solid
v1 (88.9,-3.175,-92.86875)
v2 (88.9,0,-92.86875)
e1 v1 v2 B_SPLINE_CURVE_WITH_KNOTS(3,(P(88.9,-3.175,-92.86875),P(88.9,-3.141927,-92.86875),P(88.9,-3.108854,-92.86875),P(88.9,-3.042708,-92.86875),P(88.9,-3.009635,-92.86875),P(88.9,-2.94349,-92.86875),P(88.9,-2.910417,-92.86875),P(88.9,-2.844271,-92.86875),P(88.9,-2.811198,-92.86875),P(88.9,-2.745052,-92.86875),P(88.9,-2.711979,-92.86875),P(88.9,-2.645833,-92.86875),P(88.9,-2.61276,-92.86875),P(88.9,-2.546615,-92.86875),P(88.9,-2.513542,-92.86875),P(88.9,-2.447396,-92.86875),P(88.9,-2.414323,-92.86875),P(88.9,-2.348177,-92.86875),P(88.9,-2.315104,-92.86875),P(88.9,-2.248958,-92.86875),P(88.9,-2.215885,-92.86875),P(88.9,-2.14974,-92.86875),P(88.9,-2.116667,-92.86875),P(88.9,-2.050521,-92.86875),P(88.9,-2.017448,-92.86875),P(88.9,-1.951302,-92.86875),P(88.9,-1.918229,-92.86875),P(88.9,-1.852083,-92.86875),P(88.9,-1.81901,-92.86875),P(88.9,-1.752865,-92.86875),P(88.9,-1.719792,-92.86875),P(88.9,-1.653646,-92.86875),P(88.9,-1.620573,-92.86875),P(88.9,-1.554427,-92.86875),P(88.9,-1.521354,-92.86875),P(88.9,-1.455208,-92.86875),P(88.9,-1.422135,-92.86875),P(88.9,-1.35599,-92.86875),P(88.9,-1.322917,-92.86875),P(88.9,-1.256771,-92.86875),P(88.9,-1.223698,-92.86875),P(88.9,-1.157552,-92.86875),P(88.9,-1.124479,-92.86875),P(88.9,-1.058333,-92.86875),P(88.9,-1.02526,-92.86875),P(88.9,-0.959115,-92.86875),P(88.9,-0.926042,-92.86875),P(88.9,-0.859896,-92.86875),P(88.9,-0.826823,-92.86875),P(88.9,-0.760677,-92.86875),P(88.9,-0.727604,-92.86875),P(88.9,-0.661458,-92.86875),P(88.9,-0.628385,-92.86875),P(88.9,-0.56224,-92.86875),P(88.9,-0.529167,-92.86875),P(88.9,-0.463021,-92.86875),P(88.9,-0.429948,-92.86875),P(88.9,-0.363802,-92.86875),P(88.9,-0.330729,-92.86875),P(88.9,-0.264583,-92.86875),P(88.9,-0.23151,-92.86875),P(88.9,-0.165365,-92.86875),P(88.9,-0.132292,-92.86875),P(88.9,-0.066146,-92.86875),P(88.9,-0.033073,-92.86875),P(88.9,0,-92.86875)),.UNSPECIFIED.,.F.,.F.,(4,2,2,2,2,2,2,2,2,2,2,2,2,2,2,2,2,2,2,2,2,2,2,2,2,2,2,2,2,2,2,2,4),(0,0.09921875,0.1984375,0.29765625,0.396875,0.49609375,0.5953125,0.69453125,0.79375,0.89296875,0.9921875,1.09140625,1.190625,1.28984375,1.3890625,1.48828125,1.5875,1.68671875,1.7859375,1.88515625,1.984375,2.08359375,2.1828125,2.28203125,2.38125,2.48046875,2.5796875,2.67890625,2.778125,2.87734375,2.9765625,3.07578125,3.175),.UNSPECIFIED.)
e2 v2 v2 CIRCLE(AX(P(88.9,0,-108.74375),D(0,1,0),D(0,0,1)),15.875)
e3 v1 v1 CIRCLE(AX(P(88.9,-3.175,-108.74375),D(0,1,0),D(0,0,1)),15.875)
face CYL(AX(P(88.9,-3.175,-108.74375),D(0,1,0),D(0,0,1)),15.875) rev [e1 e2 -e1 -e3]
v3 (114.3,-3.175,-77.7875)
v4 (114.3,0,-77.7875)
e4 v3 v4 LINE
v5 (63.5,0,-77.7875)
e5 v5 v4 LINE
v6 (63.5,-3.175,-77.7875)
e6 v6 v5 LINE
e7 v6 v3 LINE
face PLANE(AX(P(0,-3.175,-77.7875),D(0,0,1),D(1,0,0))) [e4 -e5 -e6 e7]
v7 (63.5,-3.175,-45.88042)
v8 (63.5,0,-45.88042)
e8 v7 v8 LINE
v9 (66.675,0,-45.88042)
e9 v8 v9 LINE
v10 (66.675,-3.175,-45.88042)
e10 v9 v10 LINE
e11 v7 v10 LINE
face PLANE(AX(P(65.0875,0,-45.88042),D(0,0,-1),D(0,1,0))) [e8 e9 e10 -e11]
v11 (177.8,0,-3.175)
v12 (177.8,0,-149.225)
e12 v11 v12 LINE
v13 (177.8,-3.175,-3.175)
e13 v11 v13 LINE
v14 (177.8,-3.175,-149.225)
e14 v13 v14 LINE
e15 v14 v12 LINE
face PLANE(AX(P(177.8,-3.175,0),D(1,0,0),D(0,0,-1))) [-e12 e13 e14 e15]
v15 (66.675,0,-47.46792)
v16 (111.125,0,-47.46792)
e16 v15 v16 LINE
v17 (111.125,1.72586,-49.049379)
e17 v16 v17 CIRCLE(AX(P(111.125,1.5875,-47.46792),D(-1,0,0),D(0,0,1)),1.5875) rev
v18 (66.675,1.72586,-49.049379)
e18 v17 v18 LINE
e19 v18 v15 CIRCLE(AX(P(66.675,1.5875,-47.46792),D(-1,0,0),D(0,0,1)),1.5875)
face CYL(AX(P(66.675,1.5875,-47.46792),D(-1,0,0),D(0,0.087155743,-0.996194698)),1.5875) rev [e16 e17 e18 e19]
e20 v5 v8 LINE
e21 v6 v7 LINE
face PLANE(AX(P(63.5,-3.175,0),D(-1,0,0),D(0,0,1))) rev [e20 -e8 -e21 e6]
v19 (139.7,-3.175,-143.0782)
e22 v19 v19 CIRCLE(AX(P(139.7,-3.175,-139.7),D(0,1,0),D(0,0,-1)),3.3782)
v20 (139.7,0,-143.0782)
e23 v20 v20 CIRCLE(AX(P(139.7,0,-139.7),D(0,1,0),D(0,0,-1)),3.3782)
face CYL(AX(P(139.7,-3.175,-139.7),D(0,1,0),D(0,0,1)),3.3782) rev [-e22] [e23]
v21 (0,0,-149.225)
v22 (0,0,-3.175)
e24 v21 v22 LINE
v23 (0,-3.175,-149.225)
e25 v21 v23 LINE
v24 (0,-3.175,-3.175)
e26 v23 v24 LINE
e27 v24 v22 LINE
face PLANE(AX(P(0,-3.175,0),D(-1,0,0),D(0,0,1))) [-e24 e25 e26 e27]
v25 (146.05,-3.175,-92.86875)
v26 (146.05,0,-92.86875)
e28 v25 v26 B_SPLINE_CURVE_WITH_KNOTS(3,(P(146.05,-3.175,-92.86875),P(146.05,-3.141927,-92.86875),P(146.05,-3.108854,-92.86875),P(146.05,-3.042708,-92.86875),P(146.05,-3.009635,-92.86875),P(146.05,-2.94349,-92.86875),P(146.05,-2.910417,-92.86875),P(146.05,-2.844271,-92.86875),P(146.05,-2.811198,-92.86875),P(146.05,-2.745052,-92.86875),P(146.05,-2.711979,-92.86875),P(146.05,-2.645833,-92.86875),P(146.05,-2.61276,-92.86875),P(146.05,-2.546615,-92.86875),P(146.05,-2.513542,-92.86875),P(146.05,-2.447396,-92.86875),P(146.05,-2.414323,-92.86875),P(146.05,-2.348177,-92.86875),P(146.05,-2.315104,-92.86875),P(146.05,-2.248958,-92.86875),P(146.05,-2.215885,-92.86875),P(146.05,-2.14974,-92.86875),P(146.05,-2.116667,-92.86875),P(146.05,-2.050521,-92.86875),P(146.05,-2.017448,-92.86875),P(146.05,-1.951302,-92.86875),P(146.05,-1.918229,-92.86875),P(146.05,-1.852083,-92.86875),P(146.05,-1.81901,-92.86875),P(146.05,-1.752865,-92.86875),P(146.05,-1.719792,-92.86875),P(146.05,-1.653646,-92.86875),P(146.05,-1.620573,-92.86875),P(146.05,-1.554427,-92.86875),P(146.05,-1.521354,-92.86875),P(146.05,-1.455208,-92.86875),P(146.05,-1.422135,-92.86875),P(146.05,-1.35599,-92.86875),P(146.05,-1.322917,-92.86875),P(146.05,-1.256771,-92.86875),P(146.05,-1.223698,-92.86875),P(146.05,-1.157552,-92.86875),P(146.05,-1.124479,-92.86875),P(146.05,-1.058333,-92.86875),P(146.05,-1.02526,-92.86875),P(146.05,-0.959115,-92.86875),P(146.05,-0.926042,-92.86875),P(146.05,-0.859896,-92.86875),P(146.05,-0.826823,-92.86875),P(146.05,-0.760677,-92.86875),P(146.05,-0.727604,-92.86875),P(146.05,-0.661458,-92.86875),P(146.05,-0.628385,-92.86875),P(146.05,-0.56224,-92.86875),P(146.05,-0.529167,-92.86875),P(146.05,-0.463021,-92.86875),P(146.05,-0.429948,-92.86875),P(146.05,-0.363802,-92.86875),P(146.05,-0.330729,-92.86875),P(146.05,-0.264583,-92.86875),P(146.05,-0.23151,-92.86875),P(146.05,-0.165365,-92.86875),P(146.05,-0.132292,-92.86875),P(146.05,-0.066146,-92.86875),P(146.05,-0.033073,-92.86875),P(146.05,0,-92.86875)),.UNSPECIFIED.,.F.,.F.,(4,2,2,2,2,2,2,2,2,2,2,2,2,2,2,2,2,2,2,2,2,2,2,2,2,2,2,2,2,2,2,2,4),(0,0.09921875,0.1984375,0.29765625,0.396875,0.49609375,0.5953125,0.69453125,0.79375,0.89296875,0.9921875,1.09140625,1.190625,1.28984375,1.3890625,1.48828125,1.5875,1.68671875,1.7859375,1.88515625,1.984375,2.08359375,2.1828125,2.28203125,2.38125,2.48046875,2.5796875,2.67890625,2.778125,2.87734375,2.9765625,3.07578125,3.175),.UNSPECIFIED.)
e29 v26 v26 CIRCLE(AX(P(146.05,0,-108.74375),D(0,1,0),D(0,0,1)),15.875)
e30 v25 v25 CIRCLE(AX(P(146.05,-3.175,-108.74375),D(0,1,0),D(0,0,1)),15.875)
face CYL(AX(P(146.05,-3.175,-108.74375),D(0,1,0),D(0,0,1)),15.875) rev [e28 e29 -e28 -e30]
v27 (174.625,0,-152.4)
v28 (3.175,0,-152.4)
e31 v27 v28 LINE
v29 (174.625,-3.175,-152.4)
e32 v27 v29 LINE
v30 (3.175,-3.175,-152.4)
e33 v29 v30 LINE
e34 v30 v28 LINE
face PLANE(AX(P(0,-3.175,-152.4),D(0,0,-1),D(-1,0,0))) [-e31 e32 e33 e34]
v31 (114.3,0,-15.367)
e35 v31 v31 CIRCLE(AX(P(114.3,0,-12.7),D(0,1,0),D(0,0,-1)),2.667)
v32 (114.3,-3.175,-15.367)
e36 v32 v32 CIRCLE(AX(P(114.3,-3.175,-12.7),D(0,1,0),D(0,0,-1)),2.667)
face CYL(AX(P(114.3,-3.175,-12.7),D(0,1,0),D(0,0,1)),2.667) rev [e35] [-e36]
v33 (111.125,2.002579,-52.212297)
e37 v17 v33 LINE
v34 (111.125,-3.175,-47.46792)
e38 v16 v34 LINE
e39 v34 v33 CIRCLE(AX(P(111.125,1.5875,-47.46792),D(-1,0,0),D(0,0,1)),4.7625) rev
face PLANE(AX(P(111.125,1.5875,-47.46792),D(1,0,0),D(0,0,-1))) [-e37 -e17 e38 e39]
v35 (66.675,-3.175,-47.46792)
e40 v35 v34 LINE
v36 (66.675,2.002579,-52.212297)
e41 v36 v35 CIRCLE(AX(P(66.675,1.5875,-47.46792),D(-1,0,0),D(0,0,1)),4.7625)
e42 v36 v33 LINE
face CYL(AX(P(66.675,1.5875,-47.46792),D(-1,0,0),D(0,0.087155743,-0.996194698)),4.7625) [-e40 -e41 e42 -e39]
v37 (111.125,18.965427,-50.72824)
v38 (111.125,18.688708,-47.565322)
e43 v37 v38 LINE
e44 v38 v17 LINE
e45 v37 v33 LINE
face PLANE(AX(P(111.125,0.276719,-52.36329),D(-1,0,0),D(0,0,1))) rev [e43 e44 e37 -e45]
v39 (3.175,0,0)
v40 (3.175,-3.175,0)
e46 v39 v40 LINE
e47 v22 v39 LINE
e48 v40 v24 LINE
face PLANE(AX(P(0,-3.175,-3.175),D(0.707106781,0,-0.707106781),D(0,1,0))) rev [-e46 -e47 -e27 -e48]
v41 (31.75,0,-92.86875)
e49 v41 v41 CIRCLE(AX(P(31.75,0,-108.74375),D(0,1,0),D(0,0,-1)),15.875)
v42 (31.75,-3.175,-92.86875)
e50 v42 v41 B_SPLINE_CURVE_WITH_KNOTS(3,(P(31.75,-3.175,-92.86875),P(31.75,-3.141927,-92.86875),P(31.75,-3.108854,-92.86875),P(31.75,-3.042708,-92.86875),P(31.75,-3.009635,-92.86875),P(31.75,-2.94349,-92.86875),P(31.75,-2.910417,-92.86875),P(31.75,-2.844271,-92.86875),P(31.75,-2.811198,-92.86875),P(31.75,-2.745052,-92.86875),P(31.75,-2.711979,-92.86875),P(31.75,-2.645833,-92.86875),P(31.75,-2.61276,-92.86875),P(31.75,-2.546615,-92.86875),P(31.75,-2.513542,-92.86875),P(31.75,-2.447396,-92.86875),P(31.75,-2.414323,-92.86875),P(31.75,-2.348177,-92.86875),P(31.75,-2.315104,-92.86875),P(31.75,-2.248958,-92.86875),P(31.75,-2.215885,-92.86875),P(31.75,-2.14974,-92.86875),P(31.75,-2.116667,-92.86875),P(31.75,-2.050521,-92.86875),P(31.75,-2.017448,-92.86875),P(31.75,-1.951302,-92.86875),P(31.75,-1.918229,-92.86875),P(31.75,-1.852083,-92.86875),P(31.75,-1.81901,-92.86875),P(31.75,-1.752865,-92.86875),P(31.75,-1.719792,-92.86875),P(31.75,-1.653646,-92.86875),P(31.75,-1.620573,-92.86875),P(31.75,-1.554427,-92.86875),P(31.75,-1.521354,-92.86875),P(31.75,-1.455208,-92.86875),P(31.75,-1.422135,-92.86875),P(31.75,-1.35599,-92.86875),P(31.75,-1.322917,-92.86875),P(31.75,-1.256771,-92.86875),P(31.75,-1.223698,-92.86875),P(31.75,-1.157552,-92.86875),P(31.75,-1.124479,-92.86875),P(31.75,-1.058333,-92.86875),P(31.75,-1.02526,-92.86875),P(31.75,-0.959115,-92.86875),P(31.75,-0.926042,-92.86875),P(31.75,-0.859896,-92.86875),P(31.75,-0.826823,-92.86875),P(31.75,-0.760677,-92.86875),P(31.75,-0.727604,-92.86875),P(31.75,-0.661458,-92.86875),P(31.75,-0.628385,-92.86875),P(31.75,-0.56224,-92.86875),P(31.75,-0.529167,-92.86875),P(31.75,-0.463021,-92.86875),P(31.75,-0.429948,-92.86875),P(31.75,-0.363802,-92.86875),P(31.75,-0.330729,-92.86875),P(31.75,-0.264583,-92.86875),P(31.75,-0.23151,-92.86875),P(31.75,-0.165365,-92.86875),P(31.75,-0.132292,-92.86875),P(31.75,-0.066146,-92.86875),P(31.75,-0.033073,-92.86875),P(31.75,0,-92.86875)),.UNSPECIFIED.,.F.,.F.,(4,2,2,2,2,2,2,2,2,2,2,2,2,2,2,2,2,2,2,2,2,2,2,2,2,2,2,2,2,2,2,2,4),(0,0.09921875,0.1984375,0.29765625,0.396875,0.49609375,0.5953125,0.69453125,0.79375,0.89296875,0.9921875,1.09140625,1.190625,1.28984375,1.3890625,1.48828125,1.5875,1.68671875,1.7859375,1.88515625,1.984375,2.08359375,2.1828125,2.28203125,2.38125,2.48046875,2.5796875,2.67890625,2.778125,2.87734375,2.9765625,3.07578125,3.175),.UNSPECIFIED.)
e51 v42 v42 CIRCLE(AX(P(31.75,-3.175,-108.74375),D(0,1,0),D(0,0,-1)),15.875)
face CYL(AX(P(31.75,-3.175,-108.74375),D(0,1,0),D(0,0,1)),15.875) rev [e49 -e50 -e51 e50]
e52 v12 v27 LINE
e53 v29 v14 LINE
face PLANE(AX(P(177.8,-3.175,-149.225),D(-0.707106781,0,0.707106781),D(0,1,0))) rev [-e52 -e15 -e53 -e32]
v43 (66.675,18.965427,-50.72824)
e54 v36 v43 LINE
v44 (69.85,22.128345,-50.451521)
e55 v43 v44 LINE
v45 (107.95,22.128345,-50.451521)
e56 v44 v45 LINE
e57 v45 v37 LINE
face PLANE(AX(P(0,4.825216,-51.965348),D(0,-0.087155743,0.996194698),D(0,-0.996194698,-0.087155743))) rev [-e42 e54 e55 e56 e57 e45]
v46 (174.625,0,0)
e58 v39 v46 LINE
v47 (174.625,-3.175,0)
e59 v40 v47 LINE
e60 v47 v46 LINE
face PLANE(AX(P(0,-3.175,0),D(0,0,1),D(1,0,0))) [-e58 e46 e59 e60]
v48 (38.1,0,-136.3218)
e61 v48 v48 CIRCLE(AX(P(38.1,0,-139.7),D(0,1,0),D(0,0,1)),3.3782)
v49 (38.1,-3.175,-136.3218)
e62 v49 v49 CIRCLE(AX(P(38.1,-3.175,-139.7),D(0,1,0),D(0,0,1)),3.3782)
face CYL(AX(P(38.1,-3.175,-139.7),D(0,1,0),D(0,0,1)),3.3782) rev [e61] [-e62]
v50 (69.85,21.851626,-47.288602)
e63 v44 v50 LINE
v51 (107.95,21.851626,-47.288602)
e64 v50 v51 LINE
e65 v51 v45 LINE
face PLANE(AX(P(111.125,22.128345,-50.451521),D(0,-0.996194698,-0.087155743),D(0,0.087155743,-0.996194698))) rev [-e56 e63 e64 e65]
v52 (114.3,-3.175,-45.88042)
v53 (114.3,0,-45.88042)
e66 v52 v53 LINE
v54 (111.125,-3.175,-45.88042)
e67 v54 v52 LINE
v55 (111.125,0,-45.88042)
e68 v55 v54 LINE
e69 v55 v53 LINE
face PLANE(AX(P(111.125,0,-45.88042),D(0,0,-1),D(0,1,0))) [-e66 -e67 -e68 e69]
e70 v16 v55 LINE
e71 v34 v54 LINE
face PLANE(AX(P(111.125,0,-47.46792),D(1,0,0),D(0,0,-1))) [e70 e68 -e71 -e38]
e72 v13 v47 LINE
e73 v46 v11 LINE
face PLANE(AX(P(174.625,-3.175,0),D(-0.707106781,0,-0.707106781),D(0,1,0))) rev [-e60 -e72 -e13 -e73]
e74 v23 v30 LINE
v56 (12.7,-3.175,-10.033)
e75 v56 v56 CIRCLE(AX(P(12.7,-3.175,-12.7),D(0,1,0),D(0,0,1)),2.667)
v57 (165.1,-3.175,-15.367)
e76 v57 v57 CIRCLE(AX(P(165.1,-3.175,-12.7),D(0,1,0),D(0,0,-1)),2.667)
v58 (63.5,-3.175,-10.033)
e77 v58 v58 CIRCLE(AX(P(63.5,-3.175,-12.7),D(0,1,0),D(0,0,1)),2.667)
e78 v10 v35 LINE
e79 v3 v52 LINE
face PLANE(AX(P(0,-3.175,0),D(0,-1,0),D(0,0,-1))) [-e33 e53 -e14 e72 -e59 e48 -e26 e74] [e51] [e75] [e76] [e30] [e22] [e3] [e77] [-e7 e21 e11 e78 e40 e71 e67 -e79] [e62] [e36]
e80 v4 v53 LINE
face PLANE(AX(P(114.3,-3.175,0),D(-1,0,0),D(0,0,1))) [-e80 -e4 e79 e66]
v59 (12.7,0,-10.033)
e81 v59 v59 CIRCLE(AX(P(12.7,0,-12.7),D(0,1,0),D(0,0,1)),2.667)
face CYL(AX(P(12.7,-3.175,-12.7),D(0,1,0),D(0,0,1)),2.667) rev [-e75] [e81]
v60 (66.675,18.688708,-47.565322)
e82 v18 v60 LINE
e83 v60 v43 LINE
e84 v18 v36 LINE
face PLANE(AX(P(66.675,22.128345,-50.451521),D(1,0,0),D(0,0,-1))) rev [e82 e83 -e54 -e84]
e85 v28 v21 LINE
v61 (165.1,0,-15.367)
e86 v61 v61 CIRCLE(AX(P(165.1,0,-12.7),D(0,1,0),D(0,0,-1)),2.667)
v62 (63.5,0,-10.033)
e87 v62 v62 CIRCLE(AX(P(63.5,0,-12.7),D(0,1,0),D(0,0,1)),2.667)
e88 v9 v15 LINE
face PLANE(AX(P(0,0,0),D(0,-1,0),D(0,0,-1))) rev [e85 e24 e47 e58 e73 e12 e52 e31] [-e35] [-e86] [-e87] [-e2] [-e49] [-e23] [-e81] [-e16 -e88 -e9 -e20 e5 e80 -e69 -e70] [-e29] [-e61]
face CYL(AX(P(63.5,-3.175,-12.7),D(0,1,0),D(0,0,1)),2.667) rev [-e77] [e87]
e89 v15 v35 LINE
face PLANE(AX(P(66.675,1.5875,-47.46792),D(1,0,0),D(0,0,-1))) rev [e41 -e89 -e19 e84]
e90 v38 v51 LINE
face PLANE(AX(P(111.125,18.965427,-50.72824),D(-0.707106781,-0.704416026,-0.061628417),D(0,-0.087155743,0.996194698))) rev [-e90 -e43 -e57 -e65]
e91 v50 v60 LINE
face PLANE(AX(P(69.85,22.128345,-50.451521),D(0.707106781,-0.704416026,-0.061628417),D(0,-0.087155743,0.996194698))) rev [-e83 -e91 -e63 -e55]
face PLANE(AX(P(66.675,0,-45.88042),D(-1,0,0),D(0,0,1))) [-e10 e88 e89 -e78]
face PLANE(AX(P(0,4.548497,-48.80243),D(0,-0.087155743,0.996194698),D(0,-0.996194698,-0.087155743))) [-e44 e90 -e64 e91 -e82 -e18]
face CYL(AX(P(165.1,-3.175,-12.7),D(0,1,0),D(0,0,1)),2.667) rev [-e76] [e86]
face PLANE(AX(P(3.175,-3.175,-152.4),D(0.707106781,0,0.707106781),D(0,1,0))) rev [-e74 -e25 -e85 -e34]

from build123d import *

# Parameters (mm, degrees)
SKETCH1_W            = 177.8
SKETCH1_H            = 152.4
SKETCH1_R            = 3.3782
SKETCH1_R_2          = 2.667
BASE_FLANGE1_DEPTH   = 3.175
CHAMFER2_SIZE        = 3.175
SKETCH7_W            = 50.8
SKETCH7_H            = 25.4
CUT_EXTRUDE2_DEPTH   = 235.197951795
EDGE_FLANGE1_START   = 65.0875
EDGE_FLANGE1_DEPTH   = 47.625
EDGE_FLANGE1_2_DEPTH = 1.5875
EDGE_FLANGE1_START_2 = 111.125
EDGE_FLANGE1_3_DEPTH = 1.5875
EDGE_FLANGE1_START_3 = 66.675
EDGE_FLANGE1_4_DEPTH = 44.45
SKETCH11_W           = 1.5875
SKETCH11_H           = 6.50708023
CUT_EXTRUDE3_DEPTH   = 236.219607319
CHAMFER3_SIZE        = 3.175
SKETCH12_R           = 15.875
CUT_EXTRUDE4_DEPTH   = 236.219607319


# Read off the part's stored shape, not the designer's step: Edge-Flange1
# Sheet-metal steps are written as plain solids
with BuildPart() as part:
    # Sketch1 → Base-Flange1 (new body)
    with BuildSketch(Plane(origin=(0, 0, 0), x_dir=(1, 0, 0), z_dir=(0, 1, 0))):
        with Locations((88.9, 76.2)):
            Rectangle(SKETCH1_W, SKETCH1_H)
        with Locations(Location((38.1, 139.7, 0), (0, 0, 270))):
            Circle(SKETCH1_R, mode=Mode.SUBTRACT)
        with Locations(Location((139.7, 139.7, 0), (0, 0, 90))):
            Circle(SKETCH1_R, mode=Mode.SUBTRACT)
        with Locations(Location((12.7, 12.7, 0), (0, 0, 270))):
            Circle(SKETCH1_R_2, mode=Mode.SUBTRACT)
        with Locations(Location((165.1, 12.7, 0), (0, 0, 90))):
            Circle(SKETCH1_R_2, mode=Mode.SUBTRACT)
        with Locations(Location((63.5, 12.7, 0), (0, 0, 270))):
            Circle(SKETCH1_R_2, mode=Mode.SUBTRACT)
        with Locations(Location((114.3, 12.7, 0), (0, 0, 90))):
            Circle(SKETCH1_R_2, mode=Mode.SUBTRACT)
    extrude(amount=-BASE_FLANGE1_DEPTH)

    # Chamfer2
    chamfer2_edges = [part.edges().sort_by_distance(p)[0] for p in [
        (0, -1.5875, -152.4),
        (177.8, -1.5875, -152.4),
        (177.8, -1.5875, 0),
        (0, -1.5875, 0),
    ]]
    chamfer(chamfer2_edges, length=CHAMFER2_SIZE)

    # Sketch7 → Cut-Extrude2 (cut, through all)
    with BuildSketch(Plane(origin=(0, 0, 0), x_dir=(1, 0, 0), z_dir=(0, 1, 0))):
        with Locations((88.9, 65.0875)):
            Rectangle(SKETCH7_W, SKETCH7_H)
    extrude(amount=-CUT_EXTRUDE2_DEPTH, mode=Mode.SUBTRACT)

    # Edge-Flange1 outline → Edge-Flange1 (cut)
    with BuildSketch(Plane.YZ.offset(EDGE_FLANGE1_START)):
        with BuildLine():
            ThreePointArc((0, -51.958047831), (-2.301064967, -50.217550427), (-3.175, -47.46791977))
            Line((-3.175, -47.46791977), (-3.175, -52.3875))
            Line((-3.175, -52.3875), (0, -52.3875))
            Line((0, -52.3875), (0, -51.958047831))
        make_face()
    extrude(amount=EDGE_FLANGE1_DEPTH, mode=Mode.SUBTRACT)

    # Edge-Flange1 2 outline → Edge-Flange1 2 (cut)
    with BuildSketch(Plane.YZ.offset(EDGE_FLANGE1_START)):
        with BuildLine():
            Line((0, -45.88041977), (-3.175, -45.88041977))
            Line((-3.175, -45.88041977), (-3.175, -47.46791977))
            ThreePointArc((-3.175, -47.46791977), (-2.301064967, -50.217550427), (0, -51.958047831))
            Line((0, -51.958047831), (0, -45.88041977))
        make_face()
    extrude(amount=EDGE_FLANGE1_2_DEPTH, mode=Mode.SUBTRACT)

    # Edge-Flange1 3 outline → Edge-Flange1 3 (cut)
    with BuildSketch(Plane.YZ.offset(EDGE_FLANGE1_START_2)):
        with BuildLine():
            Line((0, -45.88041977), (-3.175, -45.88041977))
            Line((-3.175, -45.88041977), (-3.175, -47.46791977))
            ThreePointArc((-3.175, -47.46791977), (-2.301064967, -50.217550427), (0, -51.958047831))
            Line((0, -51.958047831), (0, -45.88041977))
        make_face()
    extrude(amount=EDGE_FLANGE1_3_DEPTH, mode=Mode.SUBTRACT)

    # Edge-Flange1 4 outline → Edge-Flange1 4 (add)
    with BuildSketch(Plane.YZ.offset(EDGE_FLANGE1_START_3)):
        with BuildLine():
            ThreePointArc((1.725859742, -49.049378854), (0.515000545, -48.638347543), (0, -47.46791977))
            Line((0, -47.46791977), (0, -51.958047831))
            ThreePointArc((0, -51.958047831), (0.987663955, -52.19249414), (2.002579225, -52.21229702))
            Line((2.002579225, -52.21229702), (22.128345332, -50.451520641))
            Line((22.128345332, -50.451520641), (21.851625848, -47.288602474))
            Line((21.851625848, -47.288602474), (1.725859742, -49.049378854))
        make_face()
    extrude(amount=EDGE_FLANGE1_4_DEPTH)

    # Sketch11 → Cut-Extrude3 (cut, through all)
    with BuildSketch(Plane(origin=(0, 0, 0), x_dir=(1, 0, 0), z_dir=(0, 1, 0))):
        with Locations((64.29375, 49.133959885)):
            Rectangle(SKETCH11_W, SKETCH11_H)
        with Locations((113.50625, 49.133959885)):
            Rectangle(SKETCH11_W, SKETCH11_H)
    extrude(amount=-CUT_EXTRUDE3_DEPTH, mode=Mode.SUBTRACT)

    # Chamfer3
    chamfer3_edges = [part.edges().sort_by_distance(p)[0] for p in [
        (111.125, 21.98998559, -48.870061558),
        (66.675, 21.98998559, -48.870061558),
    ]]
    chamfer(chamfer3_edges, length=CHAMFER3_SIZE)

    # Sketch12 → Cut-Extrude4 (cut, through all)
    with BuildSketch(Plane(origin=(0, 0, 0), x_dir=(1, 0, 0), z_dir=(0, 1, 0))):
        with Locations(Location((88.9, 108.74375, 0), (0, 0, 270))):
            Circle(SKETCH12_R)
        with Locations(Location((146.05, 108.74375, 0), (0, 0, 270))):
            Circle(SKETCH12_R)
        with Locations(Location((31.75, 108.74375, 0), (0, 0, 270))):
            Circle(SKETCH12_R)
    extrude(amount=-CUT_EXTRUDE4_DEPTH, mode=Mode.SUBTRACT)


solid = part.part
